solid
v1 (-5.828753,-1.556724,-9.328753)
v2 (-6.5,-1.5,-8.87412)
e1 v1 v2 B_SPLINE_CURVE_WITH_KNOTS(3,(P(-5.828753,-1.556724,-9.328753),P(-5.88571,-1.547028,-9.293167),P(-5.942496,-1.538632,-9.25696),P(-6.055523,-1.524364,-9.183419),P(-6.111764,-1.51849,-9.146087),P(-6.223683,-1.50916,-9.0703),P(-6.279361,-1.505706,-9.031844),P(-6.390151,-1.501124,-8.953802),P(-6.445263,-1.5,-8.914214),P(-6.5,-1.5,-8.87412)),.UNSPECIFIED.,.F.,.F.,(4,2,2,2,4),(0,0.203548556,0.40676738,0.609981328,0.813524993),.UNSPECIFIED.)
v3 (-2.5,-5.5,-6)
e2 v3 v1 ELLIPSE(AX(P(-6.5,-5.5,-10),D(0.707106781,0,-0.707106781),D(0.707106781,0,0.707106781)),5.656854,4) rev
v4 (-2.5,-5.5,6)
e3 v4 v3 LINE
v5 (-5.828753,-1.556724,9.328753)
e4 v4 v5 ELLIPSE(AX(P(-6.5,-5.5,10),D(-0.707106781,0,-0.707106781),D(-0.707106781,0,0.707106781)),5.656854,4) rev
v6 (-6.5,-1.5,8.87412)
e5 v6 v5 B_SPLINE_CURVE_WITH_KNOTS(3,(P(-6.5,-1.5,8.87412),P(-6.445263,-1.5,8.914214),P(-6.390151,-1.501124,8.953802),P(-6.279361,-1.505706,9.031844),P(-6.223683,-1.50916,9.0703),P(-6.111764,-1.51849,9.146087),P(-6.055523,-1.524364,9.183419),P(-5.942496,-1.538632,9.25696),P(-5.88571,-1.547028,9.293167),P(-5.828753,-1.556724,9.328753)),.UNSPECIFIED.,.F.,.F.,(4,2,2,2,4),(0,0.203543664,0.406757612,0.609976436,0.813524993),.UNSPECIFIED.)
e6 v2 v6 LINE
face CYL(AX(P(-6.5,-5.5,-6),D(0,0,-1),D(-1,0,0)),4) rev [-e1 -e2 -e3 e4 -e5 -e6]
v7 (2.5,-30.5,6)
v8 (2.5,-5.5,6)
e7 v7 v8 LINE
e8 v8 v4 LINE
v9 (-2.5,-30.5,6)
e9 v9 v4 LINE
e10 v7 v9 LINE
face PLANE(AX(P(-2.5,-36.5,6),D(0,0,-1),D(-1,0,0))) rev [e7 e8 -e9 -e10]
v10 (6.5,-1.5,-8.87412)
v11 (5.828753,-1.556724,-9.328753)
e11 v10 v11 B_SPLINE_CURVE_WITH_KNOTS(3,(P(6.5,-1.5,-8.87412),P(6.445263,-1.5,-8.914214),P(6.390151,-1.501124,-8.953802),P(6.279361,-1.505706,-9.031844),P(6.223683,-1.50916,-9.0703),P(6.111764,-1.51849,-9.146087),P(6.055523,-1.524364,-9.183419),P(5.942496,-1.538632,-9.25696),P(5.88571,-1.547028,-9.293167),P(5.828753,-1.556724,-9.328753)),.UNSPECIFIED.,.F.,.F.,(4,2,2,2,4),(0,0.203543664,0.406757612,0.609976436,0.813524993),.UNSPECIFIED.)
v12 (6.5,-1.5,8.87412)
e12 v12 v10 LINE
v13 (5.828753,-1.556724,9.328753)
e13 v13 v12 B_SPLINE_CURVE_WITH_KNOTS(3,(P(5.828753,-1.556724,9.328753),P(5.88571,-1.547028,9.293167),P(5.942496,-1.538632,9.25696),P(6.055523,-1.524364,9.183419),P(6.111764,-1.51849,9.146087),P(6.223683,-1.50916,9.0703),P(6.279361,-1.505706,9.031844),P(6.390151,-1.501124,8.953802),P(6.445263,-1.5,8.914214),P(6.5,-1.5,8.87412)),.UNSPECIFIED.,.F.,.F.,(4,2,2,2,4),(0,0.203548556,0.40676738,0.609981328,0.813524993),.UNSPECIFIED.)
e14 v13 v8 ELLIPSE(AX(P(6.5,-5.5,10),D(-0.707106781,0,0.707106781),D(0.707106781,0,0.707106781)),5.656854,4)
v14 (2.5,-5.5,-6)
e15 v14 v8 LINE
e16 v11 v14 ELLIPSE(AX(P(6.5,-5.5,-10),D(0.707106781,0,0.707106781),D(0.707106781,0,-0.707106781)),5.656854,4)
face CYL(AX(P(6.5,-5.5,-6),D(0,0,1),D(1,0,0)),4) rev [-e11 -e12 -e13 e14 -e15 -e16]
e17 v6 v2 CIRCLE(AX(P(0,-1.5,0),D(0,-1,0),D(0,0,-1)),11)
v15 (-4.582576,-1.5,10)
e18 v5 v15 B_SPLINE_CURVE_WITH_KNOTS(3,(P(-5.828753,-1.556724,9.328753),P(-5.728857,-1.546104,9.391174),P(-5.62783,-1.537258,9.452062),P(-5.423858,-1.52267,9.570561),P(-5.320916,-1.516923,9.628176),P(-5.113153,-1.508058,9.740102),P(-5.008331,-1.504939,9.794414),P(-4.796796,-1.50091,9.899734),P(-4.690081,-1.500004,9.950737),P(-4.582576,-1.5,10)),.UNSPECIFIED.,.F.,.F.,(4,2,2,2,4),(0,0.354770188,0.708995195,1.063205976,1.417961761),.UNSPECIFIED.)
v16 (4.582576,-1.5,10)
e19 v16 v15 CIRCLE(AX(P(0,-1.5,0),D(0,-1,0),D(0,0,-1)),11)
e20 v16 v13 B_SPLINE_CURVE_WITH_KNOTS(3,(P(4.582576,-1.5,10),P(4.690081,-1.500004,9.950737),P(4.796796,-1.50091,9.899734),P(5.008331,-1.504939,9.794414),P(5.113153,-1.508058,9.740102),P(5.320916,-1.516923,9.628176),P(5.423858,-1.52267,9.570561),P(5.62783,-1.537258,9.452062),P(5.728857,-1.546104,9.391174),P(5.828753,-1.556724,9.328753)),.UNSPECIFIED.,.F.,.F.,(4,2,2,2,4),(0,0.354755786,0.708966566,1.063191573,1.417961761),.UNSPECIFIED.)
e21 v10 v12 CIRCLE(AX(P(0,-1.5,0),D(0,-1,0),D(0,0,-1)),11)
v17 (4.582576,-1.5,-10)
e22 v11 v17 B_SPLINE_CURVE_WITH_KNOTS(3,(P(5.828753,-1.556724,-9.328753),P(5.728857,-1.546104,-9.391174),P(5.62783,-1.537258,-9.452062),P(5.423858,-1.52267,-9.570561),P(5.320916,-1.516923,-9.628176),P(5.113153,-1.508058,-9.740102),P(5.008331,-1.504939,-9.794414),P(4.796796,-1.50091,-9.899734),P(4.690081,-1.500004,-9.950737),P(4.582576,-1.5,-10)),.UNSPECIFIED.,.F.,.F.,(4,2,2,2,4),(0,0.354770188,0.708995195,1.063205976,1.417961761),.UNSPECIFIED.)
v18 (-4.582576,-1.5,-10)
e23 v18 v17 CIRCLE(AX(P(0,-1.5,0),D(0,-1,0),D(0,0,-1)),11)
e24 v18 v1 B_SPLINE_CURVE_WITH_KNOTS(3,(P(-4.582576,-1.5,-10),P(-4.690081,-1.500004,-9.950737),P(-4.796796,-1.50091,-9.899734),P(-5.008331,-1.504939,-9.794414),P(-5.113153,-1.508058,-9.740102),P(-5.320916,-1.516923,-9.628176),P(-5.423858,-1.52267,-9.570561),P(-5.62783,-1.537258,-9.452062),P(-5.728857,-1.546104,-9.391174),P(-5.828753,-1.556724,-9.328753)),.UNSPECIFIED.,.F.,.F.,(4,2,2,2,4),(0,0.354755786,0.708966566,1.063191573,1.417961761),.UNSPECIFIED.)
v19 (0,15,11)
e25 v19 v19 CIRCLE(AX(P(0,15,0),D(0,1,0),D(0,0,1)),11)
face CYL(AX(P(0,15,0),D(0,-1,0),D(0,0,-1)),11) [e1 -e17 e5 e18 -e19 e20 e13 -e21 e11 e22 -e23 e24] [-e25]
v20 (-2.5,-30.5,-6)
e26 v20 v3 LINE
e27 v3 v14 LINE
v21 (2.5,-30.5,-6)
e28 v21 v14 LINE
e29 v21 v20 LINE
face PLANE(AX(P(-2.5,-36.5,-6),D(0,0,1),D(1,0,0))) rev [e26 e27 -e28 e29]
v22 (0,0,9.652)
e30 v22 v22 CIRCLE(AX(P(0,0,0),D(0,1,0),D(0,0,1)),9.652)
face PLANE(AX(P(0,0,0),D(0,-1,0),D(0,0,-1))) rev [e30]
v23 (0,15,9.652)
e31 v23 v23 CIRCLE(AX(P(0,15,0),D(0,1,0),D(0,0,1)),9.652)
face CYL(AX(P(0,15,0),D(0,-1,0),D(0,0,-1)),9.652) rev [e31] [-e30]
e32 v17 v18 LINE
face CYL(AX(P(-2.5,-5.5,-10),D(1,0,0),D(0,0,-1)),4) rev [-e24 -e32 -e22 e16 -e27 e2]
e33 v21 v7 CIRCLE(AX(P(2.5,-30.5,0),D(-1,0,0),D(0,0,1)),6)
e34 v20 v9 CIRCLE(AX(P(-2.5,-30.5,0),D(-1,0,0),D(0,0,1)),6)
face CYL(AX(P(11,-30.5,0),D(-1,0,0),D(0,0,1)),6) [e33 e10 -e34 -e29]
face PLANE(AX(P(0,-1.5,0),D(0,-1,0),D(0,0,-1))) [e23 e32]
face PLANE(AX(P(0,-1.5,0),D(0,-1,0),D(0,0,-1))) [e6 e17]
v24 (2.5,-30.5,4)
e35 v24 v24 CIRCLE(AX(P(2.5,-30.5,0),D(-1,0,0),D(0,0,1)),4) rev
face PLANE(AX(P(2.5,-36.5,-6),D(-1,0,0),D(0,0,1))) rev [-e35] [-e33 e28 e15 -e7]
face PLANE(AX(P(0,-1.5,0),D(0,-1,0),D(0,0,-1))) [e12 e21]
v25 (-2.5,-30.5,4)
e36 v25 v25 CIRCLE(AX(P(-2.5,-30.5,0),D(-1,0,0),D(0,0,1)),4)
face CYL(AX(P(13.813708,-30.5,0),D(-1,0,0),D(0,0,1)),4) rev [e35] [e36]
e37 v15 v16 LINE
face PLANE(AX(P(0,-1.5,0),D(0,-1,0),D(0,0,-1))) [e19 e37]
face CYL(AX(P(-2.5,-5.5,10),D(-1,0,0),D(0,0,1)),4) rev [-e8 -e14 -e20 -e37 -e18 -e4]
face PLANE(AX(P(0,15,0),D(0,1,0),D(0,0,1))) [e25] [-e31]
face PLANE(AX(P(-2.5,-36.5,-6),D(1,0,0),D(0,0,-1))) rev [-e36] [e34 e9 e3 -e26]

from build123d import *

# Parameters (mm, degrees)
SKETCH1_R           = 11
SKETCH1_R_2         = 9.652
BOSS_EXTRUDE1_DEPTH = 15
BOSS_EXTRUDE2_START = 1.5
SKETCH2_R           = 11
BOSS_EXTRUDE2_DEPTH = 1.5
SKETCH4_W           = 5
SKETCH4_H           = 12
BOSS_EXTRUDE4_DEPTH = 35
SKETCH5_R           = 4
CUT_EXTRUDE1_DEPTH  = 5
CUT_EXTRUDE2_DEPTH  = 41.441315508
FILLET1_R           = 4


with BuildPart() as part:
    # Sketch1 → Boss-Extrude1 (new body)
    with BuildSketch(Plane(origin=(0, 0, 0), x_dir=(1, 0, 0), z_dir=(0, 1, 0))):
        with Locations(Location((0, 0, 0), (0, 0, 270))):
            Circle(SKETCH1_R)
        with Locations(Location((0, 0, 0), (0, 0, 270))):
            Circle(SKETCH1_R_2, mode=Mode.SUBTRACT)
    extrude(amount=BOSS_EXTRUDE1_DEPTH)

    # Sketch2 → Boss-Extrude2 (add)
    with BuildSketch(Plane.XZ.offset(BOSS_EXTRUDE2_START)):
        with Locations(Location((0, 0, 0), (0, 0, 270))):
            Circle(SKETCH2_R)
    extrude(amount=-BOSS_EXTRUDE2_DEPTH)

    # Sketch4 → Boss-Extrude4 (add)
    with BuildSketch(Plane.XZ.offset(1.5)):
        Rectangle(SKETCH4_W, SKETCH4_H)
    extrude(amount=BOSS_EXTRUDE4_DEPTH)

    # Sketch5 → Cut-Extrude1 (cut)
    with BuildSketch(Plane.ZY.offset(2.5)):
        with Locations((0, -30.5)):
            Circle(SKETCH5_R)
    extrude(amount=-CUT_EXTRUDE1_DEPTH, mode=Mode.SUBTRACT)

    # Sketch6 → Cut-Extrude2 (cut, through all)
    with BuildSketch(Plane.ZY.offset(2.5)):
        with BuildLine():
            Line((-6, -30.5), (-6, -36.5))
            ThreePointArc((-6, -36.5), (0, -38.985281374), (6, -36.5))
            Line((6, -36.5), (6, -30.5))
            ThreePointArc((6, -30.5), (0, -36.5), (-6, -30.5))
        make_face()
    extrude(amount=-CUT_EXTRUDE2_DEPTH, mode=Mode.SUBTRACT)

    # Fillet1
    # the kernel refuses this fillet: 4 mm, written as the material it adds along each edge
    with BuildSketch(Plane(origin=(2.5, -1.5, -6), x_dir=(1, 0, 0), z_dir=(0, 0, 1)), Plane(origin=(-2.5, -1.5, 6), x_dir=(-1, 0, 0), z_dir=(0, 0, -1))) as fillet1_piece_1:
        with BuildLine():
            CenterArc((FILLET1_R, -FILLET1_R), FILLET1_R, 90, 90)
            Line((0, -FILLET1_R), (0, 0))
            Line((0, 0), (FILLET1_R, 0))
        make_face()
    extrude(amount=12)
    with BuildSketch(Plane(origin=(2.5, -1.5, 6), x_dir=(0, 0, 1), z_dir=(-1, 0, 0)), Plane(origin=(-2.5, -1.5, -6), x_dir=(0, 0, -1), z_dir=(1, 0, 0))) as fillet1_piece_2:
        with BuildLine():
            CenterArc((FILLET1_R, -FILLET1_R), FILLET1_R, 90, 90)
            Line((0, -FILLET1_R), (0, 0))
            Line((0, 0), (FILLET1_R, 0))
        make_face()
    extrude(amount=5)
    with BuildSketch(Plane(origin=(-2.5, -1.5, -6), x_dir=(0, 0, -1), z_dir=(1, 0, 0))) as fillet1_piece_3a_section:
        with BuildLine():
            CenterArc((FILLET1_R, -FILLET1_R), FILLET1_R, 90, 90)
            Line((0, -FILLET1_R), (0, 0))
            Line((0, 0), (FILLET1_R, 0))
        make_face()
    fillet1_piece_3a = extrude(amount=15, mode=Mode.PRIVATE)
    fillet1_piece_3a = fillet1_piece_3a & Plane(origin=(0, -2.470762695, 0), x_dir=(0, 0, -1), z_dir=(0, -1, 0)) * Cylinder(11, 46, mode=Mode.PRIVATE)
    fillet1_piece_3a = split(fillet1_piece_3a, bisect_by=Plane(origin=(2.5, -2.470762695, -6.788618782), z_dir=(1, 0, 0)), keep=Keep.TOP, mode=Mode.PRIVATE)
    with BuildSketch(Plane(origin=(2.5, -1.5, -16), x_dir=(1, 0, 0), z_dir=(0, 0, 1))) as fillet1_piece_3b_section:
        with BuildLine():
            CenterArc((FILLET1_R, -FILLET1_R), FILLET1_R, 90, 90)
            Line((0, -FILLET1_R), (0, 0))
            Line((0, 0), (FILLET1_R, 0))
        make_face()
    fillet1_piece_3b = extrude(amount=22, mode=Mode.PRIVATE)
    fillet1_piece_3b = fillet1_piece_3b & Plane(origin=(0, -2.441237168, 0), x_dir=(0, 0, -1), z_dir=(0, -1, 0)) * Cylinder(11, 60, mode=Mode.PRIVATE)
    fillet1_piece_3b = split(fillet1_piece_3b, bisect_by=Plane(origin=(3.34113706, -2.441237168, -6), z_dir=(0, 0, -1)), keep=Keep.TOP, mode=Mode.PRIVATE)
    fillet1_piece_3 = fillet1_piece_3a & fillet1_piece_3b
    add(fillet1_piece_3)
    with BuildSketch(Plane(origin=(2.5, -1.5, -6), x_dir=(1, 0, 0), z_dir=(0, 0, 1))) as fillet1_piece_4a_section:
        with BuildLine():
            CenterArc((FILLET1_R, -FILLET1_R), FILLET1_R, 90, 90)
            Line((0, -FILLET1_R), (0, 0))
            Line((0, 0), (FILLET1_R, 0))
        make_face()
    fillet1_piece_4a = extrude(amount=22, mode=Mode.PRIVATE)
    fillet1_piece_4a = fillet1_piece_4a & Plane(origin=(0, -2.441236356, 0), x_dir=(0, 0, -1), z_dir=(0, -1, 0)) * Cylinder(11, 60, mode=Mode.PRIVATE)
    fillet1_piece_4a = split(fillet1_piece_4a, bisect_by=Plane(origin=(3.341136574, -2.441236356, 6), z_dir=(0, 0, 1)), keep=Keep.TOP, mode=Mode.PRIVATE)
    with BuildSketch(Plane(origin=(12.5, -1.5, 6), x_dir=(0, 0, 1), z_dir=(-1, 0, 0))) as fillet1_piece_4b_section:
        with BuildLine():
            CenterArc((FILLET1_R, -FILLET1_R), FILLET1_R, 90, 90)
            Line((0, -FILLET1_R), (0, 0))
            Line((0, 0), (FILLET1_R, 0))
        make_face()
    fillet1_piece_4b = extrude(amount=15, mode=Mode.PRIVATE)
    fillet1_piece_4b = fillet1_piece_4b & Plane(origin=(0, -2.470761842, 0), x_dir=(0, 0, -1), z_dir=(0, -1, 0)) * Cylinder(11, 46, mode=Mode.PRIVATE)
    fillet1_piece_4b = split(fillet1_piece_4b, bisect_by=Plane(origin=(2.5, -2.470761842, 6.78861866), z_dir=(1, 0, 0)), keep=Keep.TOP, mode=Mode.PRIVATE)
    fillet1_piece_4 = fillet1_piece_4a & fillet1_piece_4b
    add(fillet1_piece_4)
    with BuildSketch(Plane(origin=(2.5, -1.5, 6), x_dir=(0, 0, 1), z_dir=(-1, 0, 0))) as fillet1_piece_5a_section:
        with BuildLine():
            CenterArc((FILLET1_R, -FILLET1_R), FILLET1_R, 90, 90)
            Line((0, -FILLET1_R), (0, 0))
            Line((0, 0), (FILLET1_R, 0))
        make_face()
    fillet1_piece_5a = extrude(amount=15, mode=Mode.PRIVATE)
    fillet1_piece_5a = fillet1_piece_5a & Plane(origin=(0, -2.470762695, 0), x_dir=(0, 0, -1), z_dir=(0, -1, 0)) * Cylinder(11, 46, mode=Mode.PRIVATE)
    fillet1_piece_5a = split(fillet1_piece_5a, bisect_by=Plane(origin=(-2.5, -2.470762695, 6.788618782), z_dir=(-1, 0, 0)), keep=Keep.TOP, mode=Mode.PRIVATE)
    with BuildSketch(Plane(origin=(-2.5, -1.5, 16), x_dir=(-1, 0, 0), z_dir=(0, 0, -1))) as fillet1_piece_5b_section:
        with BuildLine():
            CenterArc((FILLET1_R, -FILLET1_R), FILLET1_R, 90, 90)
            Line((0, -FILLET1_R), (0, 0))
            Line((0, 0), (FILLET1_R, 0))
        make_face()
    fillet1_piece_5b = extrude(amount=22, mode=Mode.PRIVATE)
    fillet1_piece_5b = fillet1_piece_5b & Plane(origin=(0, -2.441237168, 0), x_dir=(0, 0, -1), z_dir=(0, -1, 0)) * Cylinder(11, 60, mode=Mode.PRIVATE)
    fillet1_piece_5b = split(fillet1_piece_5b, bisect_by=Plane(origin=(-3.34113706, -2.441237168, 6), z_dir=(0, 0, 1)), keep=Keep.TOP, mode=Mode.PRIVATE)
    fillet1_piece_5 = fillet1_piece_5a & fillet1_piece_5b
    add(fillet1_piece_5)
    with BuildSketch(Plane(origin=(-12.5, -1.5, -6), x_dir=(0, 0, -1), z_dir=(1, 0, 0))) as fillet1_piece_6a_section:
        with BuildLine():
            CenterArc((FILLET1_R, -FILLET1_R), FILLET1_R, 90, 90)
            Line((0, -FILLET1_R), (0, 0))
            Line((0, 0), (FILLET1_R, 0))
        make_face()
    fillet1_piece_6a = extrude(amount=15, mode=Mode.PRIVATE)
    fillet1_piece_6a = fillet1_piece_6a & Plane(origin=(0, -2.470761842, 0), x_dir=(0, 0, -1), z_dir=(0, -1, 0)) * Cylinder(11, 46, mode=Mode.PRIVATE)
    fillet1_piece_6a = split(fillet1_piece_6a, bisect_by=Plane(origin=(-2.5, -2.470761842, -6.788618661), z_dir=(-1, 0, 0)), keep=Keep.TOP, mode=Mode.PRIVATE)
    with BuildSketch(Plane(origin=(-2.5, -1.5, 6), x_dir=(-1, 0, 0), z_dir=(0, 0, -1))) as fillet1_piece_6b_section:
        with BuildLine():
            CenterArc((FILLET1_R, -FILLET1_R), FILLET1_R, 90, 90)
            Line((0, -FILLET1_R), (0, 0))
            Line((0, 0), (FILLET1_R, 0))
        make_face()
    fillet1_piece_6b = extrude(amount=22, mode=Mode.PRIVATE)
    fillet1_piece_6b = fillet1_piece_6b & Plane(origin=(0, -2.441236356, 0), x_dir=(0, 0, -1), z_dir=(0, -1, 0)) * Cylinder(11, 60, mode=Mode.PRIVATE)
    fillet1_piece_6b = split(fillet1_piece_6b, bisect_by=Plane(origin=(-3.341136574, -2.441236356, -6), z_dir=(0, 0, -1)), keep=Keep.TOP, mode=Mode.PRIVATE)
    fillet1_piece_6 = fillet1_piece_6a & fillet1_piece_6b
    add(fillet1_piece_6)


solid = part.part
